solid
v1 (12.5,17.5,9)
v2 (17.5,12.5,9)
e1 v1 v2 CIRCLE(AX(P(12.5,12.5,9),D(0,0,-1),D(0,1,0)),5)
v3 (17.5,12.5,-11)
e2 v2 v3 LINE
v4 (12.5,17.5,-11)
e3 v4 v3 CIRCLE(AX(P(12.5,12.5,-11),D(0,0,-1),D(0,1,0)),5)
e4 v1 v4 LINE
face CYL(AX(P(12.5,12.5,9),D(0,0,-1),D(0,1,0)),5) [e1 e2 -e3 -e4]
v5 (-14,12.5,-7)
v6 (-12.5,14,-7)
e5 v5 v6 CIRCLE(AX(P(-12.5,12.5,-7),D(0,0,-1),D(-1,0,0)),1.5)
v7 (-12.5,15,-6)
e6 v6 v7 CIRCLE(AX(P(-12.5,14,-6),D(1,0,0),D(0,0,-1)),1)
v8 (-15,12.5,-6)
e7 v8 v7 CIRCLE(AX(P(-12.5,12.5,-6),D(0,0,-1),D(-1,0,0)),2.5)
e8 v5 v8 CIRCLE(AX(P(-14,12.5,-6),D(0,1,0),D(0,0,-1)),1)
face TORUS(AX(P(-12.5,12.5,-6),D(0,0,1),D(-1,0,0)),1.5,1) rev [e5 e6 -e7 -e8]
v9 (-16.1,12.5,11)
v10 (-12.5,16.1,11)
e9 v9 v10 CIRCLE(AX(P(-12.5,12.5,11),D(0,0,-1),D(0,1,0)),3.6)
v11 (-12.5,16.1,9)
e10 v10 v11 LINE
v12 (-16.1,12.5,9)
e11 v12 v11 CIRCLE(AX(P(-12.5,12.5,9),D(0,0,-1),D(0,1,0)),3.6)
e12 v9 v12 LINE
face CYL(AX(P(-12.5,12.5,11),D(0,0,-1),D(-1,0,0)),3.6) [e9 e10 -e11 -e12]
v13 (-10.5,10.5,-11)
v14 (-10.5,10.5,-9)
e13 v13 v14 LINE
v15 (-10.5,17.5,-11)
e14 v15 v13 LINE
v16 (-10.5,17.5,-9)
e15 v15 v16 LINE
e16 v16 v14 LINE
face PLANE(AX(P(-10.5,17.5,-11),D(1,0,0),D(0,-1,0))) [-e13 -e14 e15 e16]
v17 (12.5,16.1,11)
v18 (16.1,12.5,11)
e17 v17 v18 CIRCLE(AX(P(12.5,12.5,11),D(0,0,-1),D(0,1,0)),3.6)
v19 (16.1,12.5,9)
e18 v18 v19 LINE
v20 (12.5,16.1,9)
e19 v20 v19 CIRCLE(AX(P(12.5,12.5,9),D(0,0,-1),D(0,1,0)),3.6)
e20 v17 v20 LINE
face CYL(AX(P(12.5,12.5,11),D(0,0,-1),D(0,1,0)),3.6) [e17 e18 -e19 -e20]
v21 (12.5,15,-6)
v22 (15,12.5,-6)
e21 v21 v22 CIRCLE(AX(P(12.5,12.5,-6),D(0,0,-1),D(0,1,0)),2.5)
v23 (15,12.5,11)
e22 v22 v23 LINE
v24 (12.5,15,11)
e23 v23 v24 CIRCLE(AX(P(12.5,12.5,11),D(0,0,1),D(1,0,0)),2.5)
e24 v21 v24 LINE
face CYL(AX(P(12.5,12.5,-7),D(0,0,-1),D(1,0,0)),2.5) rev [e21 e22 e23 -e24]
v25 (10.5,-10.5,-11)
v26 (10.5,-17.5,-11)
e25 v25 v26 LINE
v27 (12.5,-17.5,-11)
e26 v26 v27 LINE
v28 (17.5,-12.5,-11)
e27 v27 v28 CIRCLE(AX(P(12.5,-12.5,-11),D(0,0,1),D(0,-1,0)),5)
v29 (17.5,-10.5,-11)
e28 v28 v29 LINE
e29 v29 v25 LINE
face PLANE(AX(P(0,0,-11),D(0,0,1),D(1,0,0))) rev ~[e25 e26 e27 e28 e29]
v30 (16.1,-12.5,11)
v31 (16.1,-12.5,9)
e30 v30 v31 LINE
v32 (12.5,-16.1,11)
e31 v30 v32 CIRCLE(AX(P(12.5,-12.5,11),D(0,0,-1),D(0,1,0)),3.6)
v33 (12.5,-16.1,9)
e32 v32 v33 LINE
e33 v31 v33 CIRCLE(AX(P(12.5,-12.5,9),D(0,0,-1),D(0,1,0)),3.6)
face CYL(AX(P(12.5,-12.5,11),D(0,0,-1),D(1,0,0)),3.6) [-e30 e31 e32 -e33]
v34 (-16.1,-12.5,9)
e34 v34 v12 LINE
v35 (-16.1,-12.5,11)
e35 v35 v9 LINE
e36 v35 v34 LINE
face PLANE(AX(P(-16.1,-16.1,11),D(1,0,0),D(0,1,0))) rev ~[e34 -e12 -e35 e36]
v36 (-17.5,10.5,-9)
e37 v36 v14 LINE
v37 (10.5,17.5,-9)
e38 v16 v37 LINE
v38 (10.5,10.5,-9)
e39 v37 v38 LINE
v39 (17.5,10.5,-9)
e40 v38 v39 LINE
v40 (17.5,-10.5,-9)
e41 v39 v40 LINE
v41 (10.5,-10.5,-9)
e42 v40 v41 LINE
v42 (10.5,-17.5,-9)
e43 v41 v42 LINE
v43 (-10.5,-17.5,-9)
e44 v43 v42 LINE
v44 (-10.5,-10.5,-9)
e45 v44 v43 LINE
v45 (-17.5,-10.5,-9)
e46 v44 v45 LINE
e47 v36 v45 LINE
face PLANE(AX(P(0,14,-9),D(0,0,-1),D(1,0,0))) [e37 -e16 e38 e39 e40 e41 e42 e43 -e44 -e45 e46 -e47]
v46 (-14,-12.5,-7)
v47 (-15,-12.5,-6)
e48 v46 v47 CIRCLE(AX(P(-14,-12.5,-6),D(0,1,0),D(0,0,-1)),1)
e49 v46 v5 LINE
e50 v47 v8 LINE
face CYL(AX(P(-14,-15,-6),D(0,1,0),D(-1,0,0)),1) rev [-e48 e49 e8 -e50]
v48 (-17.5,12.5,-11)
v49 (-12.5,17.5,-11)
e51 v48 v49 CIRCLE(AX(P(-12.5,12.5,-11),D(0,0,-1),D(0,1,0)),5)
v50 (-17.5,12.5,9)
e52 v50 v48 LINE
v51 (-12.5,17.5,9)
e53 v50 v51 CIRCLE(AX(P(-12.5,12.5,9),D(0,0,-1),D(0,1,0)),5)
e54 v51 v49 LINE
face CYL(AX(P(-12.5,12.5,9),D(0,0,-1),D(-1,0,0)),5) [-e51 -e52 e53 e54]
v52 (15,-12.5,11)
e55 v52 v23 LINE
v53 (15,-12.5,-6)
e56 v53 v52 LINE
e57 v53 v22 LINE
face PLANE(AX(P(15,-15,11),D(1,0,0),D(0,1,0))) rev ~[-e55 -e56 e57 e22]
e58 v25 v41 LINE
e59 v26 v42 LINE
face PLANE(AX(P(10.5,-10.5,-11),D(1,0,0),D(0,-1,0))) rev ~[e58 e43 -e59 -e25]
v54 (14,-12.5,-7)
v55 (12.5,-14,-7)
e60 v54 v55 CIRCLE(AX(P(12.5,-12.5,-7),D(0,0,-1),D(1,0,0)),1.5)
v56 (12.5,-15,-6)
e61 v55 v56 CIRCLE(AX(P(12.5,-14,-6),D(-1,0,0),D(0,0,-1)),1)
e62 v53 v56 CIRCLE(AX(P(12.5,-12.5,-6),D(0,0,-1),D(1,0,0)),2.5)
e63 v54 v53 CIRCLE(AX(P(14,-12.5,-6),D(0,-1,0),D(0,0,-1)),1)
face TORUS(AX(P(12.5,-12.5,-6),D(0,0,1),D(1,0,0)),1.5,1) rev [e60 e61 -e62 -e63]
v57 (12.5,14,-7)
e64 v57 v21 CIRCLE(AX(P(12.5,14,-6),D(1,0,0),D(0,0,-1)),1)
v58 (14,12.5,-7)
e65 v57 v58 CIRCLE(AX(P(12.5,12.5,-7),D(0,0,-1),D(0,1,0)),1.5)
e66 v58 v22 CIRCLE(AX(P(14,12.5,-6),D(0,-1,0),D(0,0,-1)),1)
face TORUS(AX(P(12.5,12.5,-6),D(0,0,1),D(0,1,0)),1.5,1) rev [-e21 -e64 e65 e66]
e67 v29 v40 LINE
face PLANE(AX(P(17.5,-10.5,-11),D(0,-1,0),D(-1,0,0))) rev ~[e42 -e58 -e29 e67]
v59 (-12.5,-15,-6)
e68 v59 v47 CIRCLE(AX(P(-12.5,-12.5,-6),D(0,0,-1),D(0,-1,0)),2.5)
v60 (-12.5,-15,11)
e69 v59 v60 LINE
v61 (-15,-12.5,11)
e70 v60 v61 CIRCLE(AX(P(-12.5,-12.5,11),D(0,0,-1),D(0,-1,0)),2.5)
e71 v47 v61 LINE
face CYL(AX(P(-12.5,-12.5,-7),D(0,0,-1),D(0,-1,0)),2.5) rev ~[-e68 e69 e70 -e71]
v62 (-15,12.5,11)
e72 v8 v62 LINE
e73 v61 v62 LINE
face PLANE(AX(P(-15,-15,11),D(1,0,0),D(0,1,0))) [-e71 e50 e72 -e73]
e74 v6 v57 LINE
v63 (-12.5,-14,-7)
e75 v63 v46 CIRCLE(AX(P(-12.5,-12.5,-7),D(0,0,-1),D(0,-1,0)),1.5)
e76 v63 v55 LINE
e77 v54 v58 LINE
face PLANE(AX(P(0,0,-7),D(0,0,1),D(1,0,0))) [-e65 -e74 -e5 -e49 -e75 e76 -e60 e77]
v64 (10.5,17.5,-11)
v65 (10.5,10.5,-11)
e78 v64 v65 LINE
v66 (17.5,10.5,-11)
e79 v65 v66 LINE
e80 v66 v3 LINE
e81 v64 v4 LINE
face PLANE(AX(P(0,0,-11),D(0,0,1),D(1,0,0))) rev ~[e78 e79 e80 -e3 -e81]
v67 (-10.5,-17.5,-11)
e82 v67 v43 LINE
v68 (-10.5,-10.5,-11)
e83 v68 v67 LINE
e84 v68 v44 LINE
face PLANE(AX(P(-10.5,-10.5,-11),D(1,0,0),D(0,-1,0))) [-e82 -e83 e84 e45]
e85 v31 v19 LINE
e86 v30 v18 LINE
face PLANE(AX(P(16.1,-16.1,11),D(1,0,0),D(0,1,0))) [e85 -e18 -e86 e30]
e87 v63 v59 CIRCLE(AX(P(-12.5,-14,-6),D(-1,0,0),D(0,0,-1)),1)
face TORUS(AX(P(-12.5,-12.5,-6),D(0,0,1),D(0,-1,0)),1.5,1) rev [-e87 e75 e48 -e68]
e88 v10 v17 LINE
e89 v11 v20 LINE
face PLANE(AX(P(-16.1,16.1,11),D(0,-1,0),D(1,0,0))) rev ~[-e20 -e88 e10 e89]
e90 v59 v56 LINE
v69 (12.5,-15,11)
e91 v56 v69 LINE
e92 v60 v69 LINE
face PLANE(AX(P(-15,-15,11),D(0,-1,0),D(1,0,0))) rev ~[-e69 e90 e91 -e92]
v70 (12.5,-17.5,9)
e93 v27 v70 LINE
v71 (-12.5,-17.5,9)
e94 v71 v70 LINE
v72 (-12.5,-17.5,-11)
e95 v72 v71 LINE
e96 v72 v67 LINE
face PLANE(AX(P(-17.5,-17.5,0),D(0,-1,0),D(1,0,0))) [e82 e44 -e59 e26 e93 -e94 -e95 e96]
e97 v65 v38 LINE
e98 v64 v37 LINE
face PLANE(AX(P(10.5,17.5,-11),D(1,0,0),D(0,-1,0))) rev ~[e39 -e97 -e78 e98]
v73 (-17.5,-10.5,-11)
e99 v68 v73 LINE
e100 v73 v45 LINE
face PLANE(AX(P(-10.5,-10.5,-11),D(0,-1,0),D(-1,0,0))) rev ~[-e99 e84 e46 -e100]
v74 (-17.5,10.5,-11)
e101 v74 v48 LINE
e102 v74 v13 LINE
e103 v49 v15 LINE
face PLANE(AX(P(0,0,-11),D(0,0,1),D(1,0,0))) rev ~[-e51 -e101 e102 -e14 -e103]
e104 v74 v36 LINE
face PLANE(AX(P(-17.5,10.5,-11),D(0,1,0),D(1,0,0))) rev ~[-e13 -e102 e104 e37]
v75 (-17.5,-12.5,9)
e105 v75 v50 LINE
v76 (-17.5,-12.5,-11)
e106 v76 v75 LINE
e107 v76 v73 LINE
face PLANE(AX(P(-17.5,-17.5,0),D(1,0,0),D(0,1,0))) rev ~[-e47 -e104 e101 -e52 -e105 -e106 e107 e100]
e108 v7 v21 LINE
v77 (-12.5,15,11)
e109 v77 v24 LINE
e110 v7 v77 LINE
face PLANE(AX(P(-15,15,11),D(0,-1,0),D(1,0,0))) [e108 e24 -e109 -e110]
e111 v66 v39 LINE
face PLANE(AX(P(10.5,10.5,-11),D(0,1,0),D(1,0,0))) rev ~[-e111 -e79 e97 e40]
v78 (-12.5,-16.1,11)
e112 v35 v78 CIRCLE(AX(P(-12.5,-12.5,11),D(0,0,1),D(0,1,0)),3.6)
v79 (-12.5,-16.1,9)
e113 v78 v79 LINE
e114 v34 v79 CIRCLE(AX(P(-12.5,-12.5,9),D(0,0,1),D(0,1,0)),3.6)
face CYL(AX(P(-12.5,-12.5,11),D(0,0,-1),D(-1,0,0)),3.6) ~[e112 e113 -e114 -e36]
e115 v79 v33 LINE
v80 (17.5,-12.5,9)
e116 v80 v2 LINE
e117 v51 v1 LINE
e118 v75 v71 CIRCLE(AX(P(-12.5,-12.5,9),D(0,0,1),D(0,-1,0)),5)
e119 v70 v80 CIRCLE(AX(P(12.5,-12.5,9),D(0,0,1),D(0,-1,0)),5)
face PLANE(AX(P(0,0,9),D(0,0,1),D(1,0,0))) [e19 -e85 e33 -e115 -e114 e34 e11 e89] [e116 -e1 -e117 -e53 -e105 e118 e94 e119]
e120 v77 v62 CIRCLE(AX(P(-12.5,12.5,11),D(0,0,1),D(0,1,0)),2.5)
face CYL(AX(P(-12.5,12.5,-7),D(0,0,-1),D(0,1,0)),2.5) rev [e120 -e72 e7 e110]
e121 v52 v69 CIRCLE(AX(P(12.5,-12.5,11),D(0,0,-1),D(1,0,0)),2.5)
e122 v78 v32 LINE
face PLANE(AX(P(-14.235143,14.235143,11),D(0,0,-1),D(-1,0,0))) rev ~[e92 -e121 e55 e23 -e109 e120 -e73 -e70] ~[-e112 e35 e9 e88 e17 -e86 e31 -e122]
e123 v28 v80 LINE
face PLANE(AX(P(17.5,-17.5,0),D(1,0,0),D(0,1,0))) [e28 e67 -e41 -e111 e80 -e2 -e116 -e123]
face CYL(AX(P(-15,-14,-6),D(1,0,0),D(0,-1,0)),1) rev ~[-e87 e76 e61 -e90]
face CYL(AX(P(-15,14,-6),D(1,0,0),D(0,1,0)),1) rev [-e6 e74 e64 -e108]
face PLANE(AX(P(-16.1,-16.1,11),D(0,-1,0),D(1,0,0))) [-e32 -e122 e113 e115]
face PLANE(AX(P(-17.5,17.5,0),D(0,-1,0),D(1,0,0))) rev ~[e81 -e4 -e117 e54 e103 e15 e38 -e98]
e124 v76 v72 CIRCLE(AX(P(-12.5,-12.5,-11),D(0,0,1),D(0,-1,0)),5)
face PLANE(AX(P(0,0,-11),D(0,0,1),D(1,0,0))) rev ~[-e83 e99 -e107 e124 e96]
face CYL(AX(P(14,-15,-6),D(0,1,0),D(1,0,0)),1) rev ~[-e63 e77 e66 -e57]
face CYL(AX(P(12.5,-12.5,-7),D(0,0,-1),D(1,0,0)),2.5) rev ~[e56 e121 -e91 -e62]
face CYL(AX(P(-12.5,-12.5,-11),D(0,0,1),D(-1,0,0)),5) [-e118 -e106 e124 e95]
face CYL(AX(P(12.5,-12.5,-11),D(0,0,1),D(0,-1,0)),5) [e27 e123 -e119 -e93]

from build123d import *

# Parameters (mm, degrees)
F0_W         = 35
F0_H         = 35
F1_DEPTH     = 11
F2_W         = 21
F2_H         = 7
F2_W_2       = 7
F2_H_2       = 21
F3_DEPTH     = 2
F4_W         = 35
F4_H         = 35
F4_W_2       = 32.2
F4_H_2       = 32.2
F5_DEPTH     = 2
F6_W         = 30
F6_H         = 30
F7_DEPTH     = 18
F8_R         = 1
F9_T1_DEPTH  = 18
F9_T4_ANGLE  = 90
F9_T6_ANGLE  = 90
F9_T8_ANGLE  = 90
F9_T10_ANGLE = 90
F10_R        = 3.6
F11_R        = 5


# Not quite as in the source:
# - a fillet or chamfer that OpenCascade refuses, or shapes differently, is made with other operations: its cross-section is extruded or revolved along the edge and cut away or added


with BuildPart() as f1:
    # F0 (on Top) → F1 (new body, symmetric)
    with BuildSketch(Plane.XY):
        Rectangle(F0_W, F0_H)
    extrude(amount=F1_DEPTH, both=True)

    # F2 (on face) → F3 (cut)
    with BuildSketch(Plane(origin=(0, 0, -11), x_dir=(1, 0, 0), z_dir=(0, 0, -1))):
        with Locations((0, -14)):
            Rectangle(F2_W, F2_H)
        with Locations((-14, 0)):
            Rectangle(F2_W_2, F2_H_2)
        Rectangle(F2_W, F2_H_2)
        with Locations((14, 0)):
            Rectangle(F2_W_2, F2_H_2)
        with Locations((0, 14)):
            Rectangle(F2_W, F2_H)
    extrude(amount=-F3_DEPTH, mode=Mode.SUBTRACT)

    # F4 (on face) → F5 (cut)
    with BuildSketch(Plane.XY.offset(11)):
        Rectangle(F4_W, F4_H)
        Rectangle(F4_W_2, F4_H_2, mode=Mode.SUBTRACT)
    extrude(amount=-F5_DEPTH, mode=Mode.SUBTRACT)

    # F6 (on face) → F7 (cut)
    with BuildSketch(Plane.XY.offset(11)):
        Rectangle(F6_W, F6_H)
    extrude(amount=-F7_DEPTH, mode=Mode.SUBTRACT)

    # F8
    f8_edges = [f1.edges().sort_by_distance(p)[0] for p in [
        (0, 15, -7),
        (-15, 0, -7),
        (0, -15, -7),
        (15, 0, -7),
    ]]
    fillet(f8_edges, radius=F8_R)

    # F9: fillet of radius 2.5 on 4 edges, made by hand

    # F9_s2 → F9_t1 (join)
    with BuildSketch(Plane.XY.offset(-7)):
        with BuildLine():
            ThreePointArc((-12.5, 15), (-14.267766953, 14.267766953), (-15, 12.5))
            Line((-15, 12.5), (-15, 15))
            Line((-15, 15), (-12.5, 15))
        make_face()
        with BuildLine():
            ThreePointArc((15, -12.5), (14.267766953, -14.267766953), (12.5, -15))
            Line((12.5, -15), (15, -15))
            Line((15, -15), (15, -12.5))
        make_face()
        with BuildLine():
            ThreePointArc((15, 12.5), (14.267766953, 14.267766953), (12.5, 15))
            Line((12.5, 15), (15, 15))
            Line((15, 15), (15, 12.5))
        make_face()
        with BuildLine():
            ThreePointArc((-12.5, -15), (-14.267766953, -14.267766953), (-15, -12.5))
            Line((-15, -12.5), (-15, -15))
            Line((-15, -15), (-12.5, -15))
        make_face()
    extrude(amount=F9_T1_DEPTH)

    # F9_s3 → F9_t4 (revolve)
    with BuildSketch(Plane.YZ.offset(-12.5)):
        with BuildLine():
            ThreePointArc((-14, -7), (-14.7071067812, -6.7071067812), (-15, -6))
            Line((-15, -6), (-15, -7))
            Line((-15, -7), (-14, -7))
        make_face()
    revolve(axis=Axis((-12.5, -12.5, -7), (0, 0, -1)), revolution_arc=F9_T4_ANGLE)

    # F9_s5 → F9_t6 (revolve)
    with BuildSketch(Plane.YZ.offset(12.5)):
        with BuildLine():
            ThreePointArc((14, -7), (14.7071067812, -6.7071067812), (15, -6))
            Line((15, -6), (15, -7))
            Line((15, -7), (14, -7))
        make_face()
    revolve(axis=Axis((12.5, 12.5, -7), (0, 0, -1)), revolution_arc=F9_T6_ANGLE)

    # F9_s7 → F9_t8 (revolve)
    with BuildSketch(Plane.XZ.offset(12.5)):
        with BuildLine():
            ThreePointArc((14, -7), (14.7071067812, -6.7071067812), (15, -6))
            Line((15, -6), (15, -7))
            Line((15, -7), (14, -7))
        make_face()
    revolve(axis=Axis((12.5, -12.5, -7), (0, 0, -1)), revolution_arc=F9_T8_ANGLE)

    # F9_s9 → F9_t10 (revolve)
    with BuildSketch(Plane.XZ.offset(-12.5)):
        with BuildLine():
            ThreePointArc((-14, -7), (-14.7071067812, -6.7071067812), (-15, -6))
            Line((-15, -6), (-15, -7))
            Line((-15, -7), (-14, -7))
        make_face()
    revolve(axis=Axis((-12.5, 12.5, -7), (0, 0, -1)), revolution_arc=F9_T10_ANGLE)

    # F10
    f10_edges = [f1.edges().sort_by_distance(p)[0] for p in [
        (-16.1, -16.1, 10),
        (16.1, -16.1, 10),
        (16.1, 16.1, 10),
        (-16.1, 16.1, 10),
    ]]
    fillet(f10_edges, radius=F10_R)

    # F11
    f11_edges = [f1.edges().sort_by_distance(p)[0] for p in [
        (-17.5, -17.5, -1),
        (17.5, -17.5, -1),
        (17.5, 17.5, -1),
        (-17.5, 17.5, -1),
    ]]
    fillet(f11_edges, radius=F11_R)


solid = f1.part
